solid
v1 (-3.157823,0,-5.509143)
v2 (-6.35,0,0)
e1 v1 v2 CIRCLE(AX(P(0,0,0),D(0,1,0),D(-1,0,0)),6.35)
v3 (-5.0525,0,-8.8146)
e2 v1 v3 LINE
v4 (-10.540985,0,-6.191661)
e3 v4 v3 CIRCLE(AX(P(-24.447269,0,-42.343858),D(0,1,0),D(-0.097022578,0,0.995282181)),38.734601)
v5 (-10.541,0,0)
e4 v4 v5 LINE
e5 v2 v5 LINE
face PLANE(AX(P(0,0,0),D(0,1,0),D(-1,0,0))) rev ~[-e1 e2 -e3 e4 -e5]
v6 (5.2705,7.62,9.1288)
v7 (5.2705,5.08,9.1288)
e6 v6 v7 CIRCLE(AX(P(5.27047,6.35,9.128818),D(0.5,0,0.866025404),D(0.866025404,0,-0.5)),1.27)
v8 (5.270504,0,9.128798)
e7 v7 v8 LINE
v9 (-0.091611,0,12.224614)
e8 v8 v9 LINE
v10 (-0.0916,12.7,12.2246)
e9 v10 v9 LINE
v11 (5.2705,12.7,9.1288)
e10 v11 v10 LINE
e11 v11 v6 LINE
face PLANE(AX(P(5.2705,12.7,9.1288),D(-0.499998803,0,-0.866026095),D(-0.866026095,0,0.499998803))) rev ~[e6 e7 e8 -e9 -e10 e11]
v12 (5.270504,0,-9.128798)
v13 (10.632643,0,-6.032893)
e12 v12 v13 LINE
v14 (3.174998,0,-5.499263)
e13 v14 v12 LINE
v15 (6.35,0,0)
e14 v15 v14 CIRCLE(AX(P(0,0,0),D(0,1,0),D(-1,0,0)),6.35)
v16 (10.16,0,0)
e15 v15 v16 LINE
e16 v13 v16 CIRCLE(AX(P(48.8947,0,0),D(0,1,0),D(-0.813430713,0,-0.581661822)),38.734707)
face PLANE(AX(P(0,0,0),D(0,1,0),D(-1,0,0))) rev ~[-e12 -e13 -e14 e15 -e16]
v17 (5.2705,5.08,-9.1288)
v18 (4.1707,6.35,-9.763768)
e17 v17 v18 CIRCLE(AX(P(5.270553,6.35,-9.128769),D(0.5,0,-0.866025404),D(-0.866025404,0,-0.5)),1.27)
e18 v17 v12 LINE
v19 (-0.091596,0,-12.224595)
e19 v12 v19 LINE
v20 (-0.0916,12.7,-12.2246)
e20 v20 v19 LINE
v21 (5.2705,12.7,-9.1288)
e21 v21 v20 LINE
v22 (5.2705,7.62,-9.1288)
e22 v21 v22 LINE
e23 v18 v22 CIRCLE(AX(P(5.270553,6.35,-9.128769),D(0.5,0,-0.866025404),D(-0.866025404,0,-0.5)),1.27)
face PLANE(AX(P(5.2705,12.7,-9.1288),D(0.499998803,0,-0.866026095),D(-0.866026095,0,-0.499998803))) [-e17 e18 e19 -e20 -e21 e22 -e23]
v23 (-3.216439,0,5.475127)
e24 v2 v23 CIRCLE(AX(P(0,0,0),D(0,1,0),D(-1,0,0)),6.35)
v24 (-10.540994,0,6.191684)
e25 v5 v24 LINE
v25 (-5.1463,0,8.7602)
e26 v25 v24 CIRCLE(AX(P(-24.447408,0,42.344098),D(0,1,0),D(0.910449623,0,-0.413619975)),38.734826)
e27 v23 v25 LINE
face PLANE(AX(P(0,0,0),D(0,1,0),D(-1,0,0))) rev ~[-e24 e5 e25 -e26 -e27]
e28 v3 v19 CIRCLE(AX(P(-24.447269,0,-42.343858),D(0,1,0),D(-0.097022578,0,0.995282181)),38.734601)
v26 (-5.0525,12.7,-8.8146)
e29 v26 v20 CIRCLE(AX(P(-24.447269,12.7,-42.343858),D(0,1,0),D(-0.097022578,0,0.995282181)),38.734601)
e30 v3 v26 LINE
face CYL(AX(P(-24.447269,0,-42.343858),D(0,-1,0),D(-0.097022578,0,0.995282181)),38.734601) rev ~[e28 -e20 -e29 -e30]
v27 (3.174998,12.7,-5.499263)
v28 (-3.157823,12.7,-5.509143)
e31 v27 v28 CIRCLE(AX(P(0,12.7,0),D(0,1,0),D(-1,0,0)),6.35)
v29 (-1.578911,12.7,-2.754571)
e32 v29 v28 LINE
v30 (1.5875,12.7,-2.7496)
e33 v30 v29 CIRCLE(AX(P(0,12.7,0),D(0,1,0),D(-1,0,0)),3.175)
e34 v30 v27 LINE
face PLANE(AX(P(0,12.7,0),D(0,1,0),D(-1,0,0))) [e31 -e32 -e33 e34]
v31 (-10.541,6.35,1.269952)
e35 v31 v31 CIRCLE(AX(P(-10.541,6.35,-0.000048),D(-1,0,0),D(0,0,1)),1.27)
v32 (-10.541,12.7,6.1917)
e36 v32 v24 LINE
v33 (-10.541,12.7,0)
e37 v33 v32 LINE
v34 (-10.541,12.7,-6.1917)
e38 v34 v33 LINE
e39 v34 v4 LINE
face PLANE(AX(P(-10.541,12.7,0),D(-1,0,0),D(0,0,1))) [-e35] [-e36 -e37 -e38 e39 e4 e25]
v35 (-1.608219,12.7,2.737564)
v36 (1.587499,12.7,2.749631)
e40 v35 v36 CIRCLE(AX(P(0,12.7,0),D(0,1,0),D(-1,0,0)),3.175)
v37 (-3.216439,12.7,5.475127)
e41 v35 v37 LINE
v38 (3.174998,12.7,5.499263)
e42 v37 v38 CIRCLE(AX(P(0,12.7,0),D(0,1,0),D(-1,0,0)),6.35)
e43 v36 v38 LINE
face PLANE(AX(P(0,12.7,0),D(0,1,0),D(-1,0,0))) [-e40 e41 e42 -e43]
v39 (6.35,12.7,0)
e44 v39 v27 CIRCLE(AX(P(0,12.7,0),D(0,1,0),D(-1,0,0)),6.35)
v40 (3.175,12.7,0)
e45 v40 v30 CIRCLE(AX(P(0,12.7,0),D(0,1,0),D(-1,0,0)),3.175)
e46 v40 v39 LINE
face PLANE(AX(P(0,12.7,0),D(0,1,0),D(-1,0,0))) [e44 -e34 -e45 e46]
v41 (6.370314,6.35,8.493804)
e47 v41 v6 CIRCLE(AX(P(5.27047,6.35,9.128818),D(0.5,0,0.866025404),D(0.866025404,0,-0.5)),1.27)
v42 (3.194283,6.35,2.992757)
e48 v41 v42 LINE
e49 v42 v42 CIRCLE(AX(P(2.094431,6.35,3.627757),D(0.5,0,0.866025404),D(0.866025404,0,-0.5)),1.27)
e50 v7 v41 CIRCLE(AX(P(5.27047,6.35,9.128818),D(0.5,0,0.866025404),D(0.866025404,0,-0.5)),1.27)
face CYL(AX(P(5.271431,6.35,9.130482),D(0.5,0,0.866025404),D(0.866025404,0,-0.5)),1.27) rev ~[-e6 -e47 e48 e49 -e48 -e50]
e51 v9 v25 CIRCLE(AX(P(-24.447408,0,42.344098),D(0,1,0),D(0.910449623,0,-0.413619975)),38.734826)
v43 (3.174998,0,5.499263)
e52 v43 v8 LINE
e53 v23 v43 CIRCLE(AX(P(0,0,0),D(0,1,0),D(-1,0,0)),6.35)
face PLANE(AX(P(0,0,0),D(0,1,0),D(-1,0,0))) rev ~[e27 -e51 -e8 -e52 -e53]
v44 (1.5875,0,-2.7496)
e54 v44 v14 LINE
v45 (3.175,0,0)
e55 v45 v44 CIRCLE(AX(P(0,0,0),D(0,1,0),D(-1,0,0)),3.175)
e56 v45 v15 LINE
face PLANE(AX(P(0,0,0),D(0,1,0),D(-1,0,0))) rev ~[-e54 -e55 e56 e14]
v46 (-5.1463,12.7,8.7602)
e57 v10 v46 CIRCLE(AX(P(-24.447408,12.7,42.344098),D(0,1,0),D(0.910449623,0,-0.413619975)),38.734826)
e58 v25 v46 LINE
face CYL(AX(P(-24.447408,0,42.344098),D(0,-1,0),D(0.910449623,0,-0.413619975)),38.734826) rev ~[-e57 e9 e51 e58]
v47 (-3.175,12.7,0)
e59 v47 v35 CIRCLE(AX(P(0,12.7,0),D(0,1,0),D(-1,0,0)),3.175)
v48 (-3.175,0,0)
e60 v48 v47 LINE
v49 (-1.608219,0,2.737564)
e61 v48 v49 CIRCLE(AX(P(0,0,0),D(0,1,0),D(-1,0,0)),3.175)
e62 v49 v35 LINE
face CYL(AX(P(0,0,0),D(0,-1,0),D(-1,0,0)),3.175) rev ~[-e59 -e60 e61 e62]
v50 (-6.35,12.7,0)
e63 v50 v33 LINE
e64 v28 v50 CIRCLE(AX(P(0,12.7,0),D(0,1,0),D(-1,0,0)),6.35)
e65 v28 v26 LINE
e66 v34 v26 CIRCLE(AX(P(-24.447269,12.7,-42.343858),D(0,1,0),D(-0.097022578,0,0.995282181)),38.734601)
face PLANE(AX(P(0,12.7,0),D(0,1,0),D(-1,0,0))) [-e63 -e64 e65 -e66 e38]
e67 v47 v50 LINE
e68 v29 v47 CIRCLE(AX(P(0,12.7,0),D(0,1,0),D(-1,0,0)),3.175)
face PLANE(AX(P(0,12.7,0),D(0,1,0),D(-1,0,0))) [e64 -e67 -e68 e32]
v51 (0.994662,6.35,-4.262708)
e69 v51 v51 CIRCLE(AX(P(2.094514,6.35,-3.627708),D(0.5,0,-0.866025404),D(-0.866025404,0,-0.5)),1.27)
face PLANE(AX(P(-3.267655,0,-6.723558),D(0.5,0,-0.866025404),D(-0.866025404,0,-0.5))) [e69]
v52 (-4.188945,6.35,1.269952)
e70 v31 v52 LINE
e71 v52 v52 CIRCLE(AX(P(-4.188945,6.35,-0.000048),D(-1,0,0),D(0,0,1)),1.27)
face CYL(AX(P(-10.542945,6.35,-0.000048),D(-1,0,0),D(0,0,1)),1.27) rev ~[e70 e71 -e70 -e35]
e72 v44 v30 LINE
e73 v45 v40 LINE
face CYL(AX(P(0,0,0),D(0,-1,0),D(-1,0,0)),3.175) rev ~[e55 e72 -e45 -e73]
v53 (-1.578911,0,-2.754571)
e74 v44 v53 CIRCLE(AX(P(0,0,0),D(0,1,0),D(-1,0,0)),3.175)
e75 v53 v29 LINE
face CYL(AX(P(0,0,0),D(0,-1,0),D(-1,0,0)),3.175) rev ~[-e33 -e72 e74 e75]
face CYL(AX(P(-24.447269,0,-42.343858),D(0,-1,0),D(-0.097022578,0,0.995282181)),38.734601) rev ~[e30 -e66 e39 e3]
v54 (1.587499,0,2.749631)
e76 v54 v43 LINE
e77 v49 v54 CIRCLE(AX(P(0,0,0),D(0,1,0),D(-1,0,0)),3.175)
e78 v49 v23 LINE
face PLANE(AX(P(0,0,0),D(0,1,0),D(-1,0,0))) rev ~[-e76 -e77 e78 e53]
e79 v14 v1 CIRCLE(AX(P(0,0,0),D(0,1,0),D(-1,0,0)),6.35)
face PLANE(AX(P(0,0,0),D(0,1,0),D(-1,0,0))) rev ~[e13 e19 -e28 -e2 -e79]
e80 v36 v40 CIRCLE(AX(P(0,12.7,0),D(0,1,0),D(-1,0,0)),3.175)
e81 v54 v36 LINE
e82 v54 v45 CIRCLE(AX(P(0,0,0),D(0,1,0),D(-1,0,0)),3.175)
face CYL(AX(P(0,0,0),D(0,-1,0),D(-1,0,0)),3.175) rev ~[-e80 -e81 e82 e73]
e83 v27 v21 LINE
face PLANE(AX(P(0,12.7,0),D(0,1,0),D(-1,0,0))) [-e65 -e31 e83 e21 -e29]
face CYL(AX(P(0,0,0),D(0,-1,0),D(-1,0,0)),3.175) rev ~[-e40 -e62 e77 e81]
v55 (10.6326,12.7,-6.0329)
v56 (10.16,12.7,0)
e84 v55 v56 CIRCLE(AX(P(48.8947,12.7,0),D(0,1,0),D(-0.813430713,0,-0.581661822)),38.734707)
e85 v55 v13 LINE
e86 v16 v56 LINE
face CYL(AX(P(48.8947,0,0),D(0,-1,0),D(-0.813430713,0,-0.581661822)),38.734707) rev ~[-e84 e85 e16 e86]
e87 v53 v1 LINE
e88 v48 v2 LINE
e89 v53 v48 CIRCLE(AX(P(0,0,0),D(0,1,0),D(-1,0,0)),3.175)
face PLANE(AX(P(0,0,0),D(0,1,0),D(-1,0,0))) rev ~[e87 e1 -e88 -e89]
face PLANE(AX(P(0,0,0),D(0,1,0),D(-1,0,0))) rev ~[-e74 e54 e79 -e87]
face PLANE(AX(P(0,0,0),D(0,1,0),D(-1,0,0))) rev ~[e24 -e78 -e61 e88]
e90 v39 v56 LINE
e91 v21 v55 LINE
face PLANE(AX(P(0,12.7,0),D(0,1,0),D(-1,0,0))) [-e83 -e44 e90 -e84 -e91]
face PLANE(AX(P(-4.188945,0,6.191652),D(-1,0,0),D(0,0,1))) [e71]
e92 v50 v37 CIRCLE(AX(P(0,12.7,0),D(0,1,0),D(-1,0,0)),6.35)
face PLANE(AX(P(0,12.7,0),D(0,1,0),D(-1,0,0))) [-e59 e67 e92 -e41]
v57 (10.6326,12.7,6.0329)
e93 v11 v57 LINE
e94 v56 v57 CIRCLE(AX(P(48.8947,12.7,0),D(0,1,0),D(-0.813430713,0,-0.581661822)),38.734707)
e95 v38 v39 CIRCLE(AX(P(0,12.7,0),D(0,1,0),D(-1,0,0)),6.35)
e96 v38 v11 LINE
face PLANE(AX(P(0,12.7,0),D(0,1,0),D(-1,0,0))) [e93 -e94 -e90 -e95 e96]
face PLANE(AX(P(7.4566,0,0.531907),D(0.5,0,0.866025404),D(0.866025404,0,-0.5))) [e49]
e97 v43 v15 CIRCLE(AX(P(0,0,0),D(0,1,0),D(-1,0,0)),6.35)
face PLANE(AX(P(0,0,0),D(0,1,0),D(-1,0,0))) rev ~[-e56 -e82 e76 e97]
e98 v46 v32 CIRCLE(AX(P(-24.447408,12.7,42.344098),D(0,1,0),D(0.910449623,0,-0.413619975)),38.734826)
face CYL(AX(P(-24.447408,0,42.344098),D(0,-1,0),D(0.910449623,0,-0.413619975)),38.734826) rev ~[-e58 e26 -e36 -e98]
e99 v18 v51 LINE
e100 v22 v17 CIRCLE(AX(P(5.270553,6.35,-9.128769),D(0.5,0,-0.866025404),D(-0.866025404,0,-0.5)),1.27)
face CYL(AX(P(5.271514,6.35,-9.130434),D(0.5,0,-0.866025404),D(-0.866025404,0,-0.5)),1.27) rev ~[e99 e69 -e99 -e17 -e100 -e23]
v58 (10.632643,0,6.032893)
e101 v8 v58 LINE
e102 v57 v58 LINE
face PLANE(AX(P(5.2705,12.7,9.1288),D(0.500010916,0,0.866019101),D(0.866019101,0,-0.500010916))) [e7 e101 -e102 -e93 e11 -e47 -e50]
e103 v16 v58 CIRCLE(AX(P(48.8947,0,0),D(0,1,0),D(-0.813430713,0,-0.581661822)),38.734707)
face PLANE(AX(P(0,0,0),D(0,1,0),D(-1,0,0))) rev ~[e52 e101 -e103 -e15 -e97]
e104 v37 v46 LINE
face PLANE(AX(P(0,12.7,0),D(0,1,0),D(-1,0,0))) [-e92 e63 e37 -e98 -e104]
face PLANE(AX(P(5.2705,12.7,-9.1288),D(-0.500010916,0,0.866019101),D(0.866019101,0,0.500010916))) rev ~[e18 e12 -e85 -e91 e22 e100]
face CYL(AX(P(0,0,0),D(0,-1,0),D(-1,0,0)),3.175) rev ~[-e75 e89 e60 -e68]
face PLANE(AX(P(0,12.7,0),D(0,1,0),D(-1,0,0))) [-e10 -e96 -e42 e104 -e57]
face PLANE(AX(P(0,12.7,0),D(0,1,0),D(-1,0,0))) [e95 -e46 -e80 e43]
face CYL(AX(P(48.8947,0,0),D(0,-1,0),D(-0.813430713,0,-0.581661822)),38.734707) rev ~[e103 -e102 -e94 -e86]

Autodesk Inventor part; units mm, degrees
ref_plane "YZ Plane" through (0, 0, 0) normal (1, 0, 0) x (0, 1, 0)
ref_plane "XZ Plane" through (0, 0, 0) normal (0, 1, 0) x (-1, 0, 0)
ref_plane "XY Plane" through (0, 0, 0) normal (0, 0, 1) x (1, 0, 0)
sketch "Sketch1" plane through (0, 0, 0) normal (0, 1, 0) x (-1, 0, 0)
  line L0 (0, 0) -> (28.575, 0)
  line L1 (28.575, 0) -> (0, 0)
  line L2 (0, 0) -> (-14.2875, -24.7467)
  line L3 (0, 0) -> (28.575, 0) construction
  line L4 (0, 0) -> (-14.2875, 24.7467)
  line L5 (0, 0) -> (28.575, 0) construction
  circle A0 centre (28.575, 0) radius 2.54
  circle A1 centre (-14.2875, -24.7467) radius 2.54
  circle A2 centre (-14.2875, 24.7467) radius 2.54
  circle A3 centre (0, 0) radius 3.175
  circle A4 centre (0, 0) radius 6.35
  line L6 (-1.5875, -2.7496) -> (0, 0)
  line L7 (0, 0) -> (-6.35, 0)
  circle A5 centre (-14.2875, 24.7467) radius 3.81
  circle A6 centre (28.575, 0) radius 3.81
  circle A7 centre (-14.2875, -24.7467) radius 3.81
  line L8 (30.6811, 3.175) -> (-12.1814, 27.9217)
  line L9 (28.2054, -3.792) -> (-10.8187, -26.3226)
  line L10 (-18.0975, 24.7467) -> (-18.0975, -24.7467)
  line L11 (0, 0) -> (5.0525, -8.8146)
  line L12 (0, 0) -> (5.1463, 8.7602)
  line L13 (0, 0) -> (-10.16, 0)
  arc A8 (28.2054, -3.792) -> (-10.8187, -26.3226) centre (24.4473, -42.344) ccw
  arc A9 (-10.8187, 26.3226) -> (28.2054, 3.792) centre (24.4473, 42.344) ccw
  arc A10 (-17.3867, -22.5305) -> (-17.3867, 22.5305) centre (-48.8947, 0) ccw
  point P0 (5.1074, 8.7829)
  point P1 (-10.16, 0.0317)
  point P2 (30.2716, 3.4114)
  point P3 (28.2054, 3.792)
  point P4 (-10.8187, 26.3226)
  point P5 (-17.3867, 22.5305)
  point P6 (-17.3867, -22.5305)
  dimension "d9" = 6.35
  dimension "d41" = 12.7
  dimension "d0" = 28.575
  dimension "d1" = 28.575
  dimension "d2" = 120
  dimension "d3" = 28.575
  dimension "d4" = 120
  dimension "d5" = 5.08
  dimension "d6" = 5.08
  dimension "d7" = 5.08
  dimension "d42" = 7.62
  dimension "d43" = 7.62
  dimension "d44" = 7.62
  dimension "d47" = 10.16
  dimension "d48" = 10.16
  dimension "d49" = 10.16
  dimension "d52" = 360
extrude "Extrusion4" add sketch "Sketch1" along normal blind 12.7 contours A3 L12 A4 L0 | L0 A4 L11 A3 | A3 L11 A4 L2 | L2 A4 L7 A3 | A3 L7 A4 L4 | L4 A4 L12 A3 | A4 L12 A9 A6 L0 | L0 A6 A8 L11 A4 | A4 L11 A8 A7 L2 | L2 A7 A10 L13 A4 | A4 L13 A10 A5 L4 | L4 A5 A9 L12 A4 | A6 L8 | A7 | A5 picked at (31.8987, 0.5122)
sketch "Sketch15" plane through (0, 12.7, 0) normal (0, 1, 0) x (1, 0, 0)
  circle A0 centre (-28.575, 0) radius 2.54 projected
  line L0 (-28.575, 0) -> (-10.541, 0)
  circle A1 centre (14.2875, 24.7467) radius 2.54 projected
  circle A2 centre (14.2875, -24.7467) radius 2.54 projected
  line L1 (14.2875, -24.7467) -> (5.2705, -9.1288)
  line L2 (14.2875, 24.7467) -> (5.2705, 9.1288)
  line L3 (-10.541, 0) -> (-10.541, 6.1917)
  arc A3 (-28.2054, 3.792) -> (10.8187, 26.3226) centre (-24.4473, 42.344) ccw projected
  line L4 (-10.541, 0) -> (-10.541, -6.1917)
  arc A4 (10.8187, -26.3226) -> (-28.2054, -3.792) centre (-24.4473, -42.344) ccw projected
  arc A5 (17.3867, 22.5305) -> (17.3867, -22.5305) centre (48.8947, 0) ccw projected
  line L5 (5.2705, -9.1288) -> (10.6326, -6.0329)
  line L6 (5.2705, -9.1288) -> (-0.0916, -12.2246)
  line L7 (5.2705, 9.1288) -> (-0.0916, 12.2246)
  line L8 (5.2705, 9.1288) -> (10.6326, 6.0329)
  arc A6 (10.8187, -26.3226) -> (17.3867, -22.5305) centre (14.2875, -24.7467) ccw projected
  arc A7 (17.3867, 22.5305) -> (10.8187, 26.3226) centre (14.2875, 24.7467) ccw projected
  arc A8 (-28.2054, 3.792) -> (-30.6811, -3.175) centre (-28.575, 0) ccw projected
  line L9 (-30.6811, -3.175) -> (-30.2716, -3.4114) projected
  arc A9 (-30.2716, -3.4114) -> (-28.2054, -3.792) centre (-28.575, 0) ccw projected
  point P0 (0, 0)
  dimension "d91" = 18.034
  dimension "d92" = 18.034
  dimension "d93" = 18.034
extrude "Extrusion7" cut sketch "Sketch15" against normal blind 25.4 contours L4 A4 A9 L9 A8 A3 L3 | A3 A7 A5 L8 L7 | L6 L5 A5 A6 A4
sketch "Sketch16" plane through (10.6326, 0, 6.0329) normal (0.5, 0, 0.8660254) x (0.8660254, 0, -0.5)
  line L0 (-9.3667, 12.7) -> (-3.0167, 12.7) projected
  line L1 (-6.1917, 12.7) -> (-6.1917, 0)
  line L2 (-12.3833, 0) -> (-12.3833, 12.7) projected
  line L3 (-12.3833, 6.35) -> (0, 6.35)
  line L4 (0, 12.7) -> (0, 0) projected
  circle A0 centre (-6.1917, 6.35) radius 1.27
  dimension "d96" = 2.54
extrude "Extrusion8" cut sketch "Sketch16" against normal blind 6.35
thread "Thread1" size "M2.6x0.45" class "6H" standard "ISO Metric profile" full length
pattern_circular "Circular Pattern1" count 3 over 360 about axis through (0, 0, 0) along (0, 1, 0) of "Extrusion8"
properties part number "stability copy"
